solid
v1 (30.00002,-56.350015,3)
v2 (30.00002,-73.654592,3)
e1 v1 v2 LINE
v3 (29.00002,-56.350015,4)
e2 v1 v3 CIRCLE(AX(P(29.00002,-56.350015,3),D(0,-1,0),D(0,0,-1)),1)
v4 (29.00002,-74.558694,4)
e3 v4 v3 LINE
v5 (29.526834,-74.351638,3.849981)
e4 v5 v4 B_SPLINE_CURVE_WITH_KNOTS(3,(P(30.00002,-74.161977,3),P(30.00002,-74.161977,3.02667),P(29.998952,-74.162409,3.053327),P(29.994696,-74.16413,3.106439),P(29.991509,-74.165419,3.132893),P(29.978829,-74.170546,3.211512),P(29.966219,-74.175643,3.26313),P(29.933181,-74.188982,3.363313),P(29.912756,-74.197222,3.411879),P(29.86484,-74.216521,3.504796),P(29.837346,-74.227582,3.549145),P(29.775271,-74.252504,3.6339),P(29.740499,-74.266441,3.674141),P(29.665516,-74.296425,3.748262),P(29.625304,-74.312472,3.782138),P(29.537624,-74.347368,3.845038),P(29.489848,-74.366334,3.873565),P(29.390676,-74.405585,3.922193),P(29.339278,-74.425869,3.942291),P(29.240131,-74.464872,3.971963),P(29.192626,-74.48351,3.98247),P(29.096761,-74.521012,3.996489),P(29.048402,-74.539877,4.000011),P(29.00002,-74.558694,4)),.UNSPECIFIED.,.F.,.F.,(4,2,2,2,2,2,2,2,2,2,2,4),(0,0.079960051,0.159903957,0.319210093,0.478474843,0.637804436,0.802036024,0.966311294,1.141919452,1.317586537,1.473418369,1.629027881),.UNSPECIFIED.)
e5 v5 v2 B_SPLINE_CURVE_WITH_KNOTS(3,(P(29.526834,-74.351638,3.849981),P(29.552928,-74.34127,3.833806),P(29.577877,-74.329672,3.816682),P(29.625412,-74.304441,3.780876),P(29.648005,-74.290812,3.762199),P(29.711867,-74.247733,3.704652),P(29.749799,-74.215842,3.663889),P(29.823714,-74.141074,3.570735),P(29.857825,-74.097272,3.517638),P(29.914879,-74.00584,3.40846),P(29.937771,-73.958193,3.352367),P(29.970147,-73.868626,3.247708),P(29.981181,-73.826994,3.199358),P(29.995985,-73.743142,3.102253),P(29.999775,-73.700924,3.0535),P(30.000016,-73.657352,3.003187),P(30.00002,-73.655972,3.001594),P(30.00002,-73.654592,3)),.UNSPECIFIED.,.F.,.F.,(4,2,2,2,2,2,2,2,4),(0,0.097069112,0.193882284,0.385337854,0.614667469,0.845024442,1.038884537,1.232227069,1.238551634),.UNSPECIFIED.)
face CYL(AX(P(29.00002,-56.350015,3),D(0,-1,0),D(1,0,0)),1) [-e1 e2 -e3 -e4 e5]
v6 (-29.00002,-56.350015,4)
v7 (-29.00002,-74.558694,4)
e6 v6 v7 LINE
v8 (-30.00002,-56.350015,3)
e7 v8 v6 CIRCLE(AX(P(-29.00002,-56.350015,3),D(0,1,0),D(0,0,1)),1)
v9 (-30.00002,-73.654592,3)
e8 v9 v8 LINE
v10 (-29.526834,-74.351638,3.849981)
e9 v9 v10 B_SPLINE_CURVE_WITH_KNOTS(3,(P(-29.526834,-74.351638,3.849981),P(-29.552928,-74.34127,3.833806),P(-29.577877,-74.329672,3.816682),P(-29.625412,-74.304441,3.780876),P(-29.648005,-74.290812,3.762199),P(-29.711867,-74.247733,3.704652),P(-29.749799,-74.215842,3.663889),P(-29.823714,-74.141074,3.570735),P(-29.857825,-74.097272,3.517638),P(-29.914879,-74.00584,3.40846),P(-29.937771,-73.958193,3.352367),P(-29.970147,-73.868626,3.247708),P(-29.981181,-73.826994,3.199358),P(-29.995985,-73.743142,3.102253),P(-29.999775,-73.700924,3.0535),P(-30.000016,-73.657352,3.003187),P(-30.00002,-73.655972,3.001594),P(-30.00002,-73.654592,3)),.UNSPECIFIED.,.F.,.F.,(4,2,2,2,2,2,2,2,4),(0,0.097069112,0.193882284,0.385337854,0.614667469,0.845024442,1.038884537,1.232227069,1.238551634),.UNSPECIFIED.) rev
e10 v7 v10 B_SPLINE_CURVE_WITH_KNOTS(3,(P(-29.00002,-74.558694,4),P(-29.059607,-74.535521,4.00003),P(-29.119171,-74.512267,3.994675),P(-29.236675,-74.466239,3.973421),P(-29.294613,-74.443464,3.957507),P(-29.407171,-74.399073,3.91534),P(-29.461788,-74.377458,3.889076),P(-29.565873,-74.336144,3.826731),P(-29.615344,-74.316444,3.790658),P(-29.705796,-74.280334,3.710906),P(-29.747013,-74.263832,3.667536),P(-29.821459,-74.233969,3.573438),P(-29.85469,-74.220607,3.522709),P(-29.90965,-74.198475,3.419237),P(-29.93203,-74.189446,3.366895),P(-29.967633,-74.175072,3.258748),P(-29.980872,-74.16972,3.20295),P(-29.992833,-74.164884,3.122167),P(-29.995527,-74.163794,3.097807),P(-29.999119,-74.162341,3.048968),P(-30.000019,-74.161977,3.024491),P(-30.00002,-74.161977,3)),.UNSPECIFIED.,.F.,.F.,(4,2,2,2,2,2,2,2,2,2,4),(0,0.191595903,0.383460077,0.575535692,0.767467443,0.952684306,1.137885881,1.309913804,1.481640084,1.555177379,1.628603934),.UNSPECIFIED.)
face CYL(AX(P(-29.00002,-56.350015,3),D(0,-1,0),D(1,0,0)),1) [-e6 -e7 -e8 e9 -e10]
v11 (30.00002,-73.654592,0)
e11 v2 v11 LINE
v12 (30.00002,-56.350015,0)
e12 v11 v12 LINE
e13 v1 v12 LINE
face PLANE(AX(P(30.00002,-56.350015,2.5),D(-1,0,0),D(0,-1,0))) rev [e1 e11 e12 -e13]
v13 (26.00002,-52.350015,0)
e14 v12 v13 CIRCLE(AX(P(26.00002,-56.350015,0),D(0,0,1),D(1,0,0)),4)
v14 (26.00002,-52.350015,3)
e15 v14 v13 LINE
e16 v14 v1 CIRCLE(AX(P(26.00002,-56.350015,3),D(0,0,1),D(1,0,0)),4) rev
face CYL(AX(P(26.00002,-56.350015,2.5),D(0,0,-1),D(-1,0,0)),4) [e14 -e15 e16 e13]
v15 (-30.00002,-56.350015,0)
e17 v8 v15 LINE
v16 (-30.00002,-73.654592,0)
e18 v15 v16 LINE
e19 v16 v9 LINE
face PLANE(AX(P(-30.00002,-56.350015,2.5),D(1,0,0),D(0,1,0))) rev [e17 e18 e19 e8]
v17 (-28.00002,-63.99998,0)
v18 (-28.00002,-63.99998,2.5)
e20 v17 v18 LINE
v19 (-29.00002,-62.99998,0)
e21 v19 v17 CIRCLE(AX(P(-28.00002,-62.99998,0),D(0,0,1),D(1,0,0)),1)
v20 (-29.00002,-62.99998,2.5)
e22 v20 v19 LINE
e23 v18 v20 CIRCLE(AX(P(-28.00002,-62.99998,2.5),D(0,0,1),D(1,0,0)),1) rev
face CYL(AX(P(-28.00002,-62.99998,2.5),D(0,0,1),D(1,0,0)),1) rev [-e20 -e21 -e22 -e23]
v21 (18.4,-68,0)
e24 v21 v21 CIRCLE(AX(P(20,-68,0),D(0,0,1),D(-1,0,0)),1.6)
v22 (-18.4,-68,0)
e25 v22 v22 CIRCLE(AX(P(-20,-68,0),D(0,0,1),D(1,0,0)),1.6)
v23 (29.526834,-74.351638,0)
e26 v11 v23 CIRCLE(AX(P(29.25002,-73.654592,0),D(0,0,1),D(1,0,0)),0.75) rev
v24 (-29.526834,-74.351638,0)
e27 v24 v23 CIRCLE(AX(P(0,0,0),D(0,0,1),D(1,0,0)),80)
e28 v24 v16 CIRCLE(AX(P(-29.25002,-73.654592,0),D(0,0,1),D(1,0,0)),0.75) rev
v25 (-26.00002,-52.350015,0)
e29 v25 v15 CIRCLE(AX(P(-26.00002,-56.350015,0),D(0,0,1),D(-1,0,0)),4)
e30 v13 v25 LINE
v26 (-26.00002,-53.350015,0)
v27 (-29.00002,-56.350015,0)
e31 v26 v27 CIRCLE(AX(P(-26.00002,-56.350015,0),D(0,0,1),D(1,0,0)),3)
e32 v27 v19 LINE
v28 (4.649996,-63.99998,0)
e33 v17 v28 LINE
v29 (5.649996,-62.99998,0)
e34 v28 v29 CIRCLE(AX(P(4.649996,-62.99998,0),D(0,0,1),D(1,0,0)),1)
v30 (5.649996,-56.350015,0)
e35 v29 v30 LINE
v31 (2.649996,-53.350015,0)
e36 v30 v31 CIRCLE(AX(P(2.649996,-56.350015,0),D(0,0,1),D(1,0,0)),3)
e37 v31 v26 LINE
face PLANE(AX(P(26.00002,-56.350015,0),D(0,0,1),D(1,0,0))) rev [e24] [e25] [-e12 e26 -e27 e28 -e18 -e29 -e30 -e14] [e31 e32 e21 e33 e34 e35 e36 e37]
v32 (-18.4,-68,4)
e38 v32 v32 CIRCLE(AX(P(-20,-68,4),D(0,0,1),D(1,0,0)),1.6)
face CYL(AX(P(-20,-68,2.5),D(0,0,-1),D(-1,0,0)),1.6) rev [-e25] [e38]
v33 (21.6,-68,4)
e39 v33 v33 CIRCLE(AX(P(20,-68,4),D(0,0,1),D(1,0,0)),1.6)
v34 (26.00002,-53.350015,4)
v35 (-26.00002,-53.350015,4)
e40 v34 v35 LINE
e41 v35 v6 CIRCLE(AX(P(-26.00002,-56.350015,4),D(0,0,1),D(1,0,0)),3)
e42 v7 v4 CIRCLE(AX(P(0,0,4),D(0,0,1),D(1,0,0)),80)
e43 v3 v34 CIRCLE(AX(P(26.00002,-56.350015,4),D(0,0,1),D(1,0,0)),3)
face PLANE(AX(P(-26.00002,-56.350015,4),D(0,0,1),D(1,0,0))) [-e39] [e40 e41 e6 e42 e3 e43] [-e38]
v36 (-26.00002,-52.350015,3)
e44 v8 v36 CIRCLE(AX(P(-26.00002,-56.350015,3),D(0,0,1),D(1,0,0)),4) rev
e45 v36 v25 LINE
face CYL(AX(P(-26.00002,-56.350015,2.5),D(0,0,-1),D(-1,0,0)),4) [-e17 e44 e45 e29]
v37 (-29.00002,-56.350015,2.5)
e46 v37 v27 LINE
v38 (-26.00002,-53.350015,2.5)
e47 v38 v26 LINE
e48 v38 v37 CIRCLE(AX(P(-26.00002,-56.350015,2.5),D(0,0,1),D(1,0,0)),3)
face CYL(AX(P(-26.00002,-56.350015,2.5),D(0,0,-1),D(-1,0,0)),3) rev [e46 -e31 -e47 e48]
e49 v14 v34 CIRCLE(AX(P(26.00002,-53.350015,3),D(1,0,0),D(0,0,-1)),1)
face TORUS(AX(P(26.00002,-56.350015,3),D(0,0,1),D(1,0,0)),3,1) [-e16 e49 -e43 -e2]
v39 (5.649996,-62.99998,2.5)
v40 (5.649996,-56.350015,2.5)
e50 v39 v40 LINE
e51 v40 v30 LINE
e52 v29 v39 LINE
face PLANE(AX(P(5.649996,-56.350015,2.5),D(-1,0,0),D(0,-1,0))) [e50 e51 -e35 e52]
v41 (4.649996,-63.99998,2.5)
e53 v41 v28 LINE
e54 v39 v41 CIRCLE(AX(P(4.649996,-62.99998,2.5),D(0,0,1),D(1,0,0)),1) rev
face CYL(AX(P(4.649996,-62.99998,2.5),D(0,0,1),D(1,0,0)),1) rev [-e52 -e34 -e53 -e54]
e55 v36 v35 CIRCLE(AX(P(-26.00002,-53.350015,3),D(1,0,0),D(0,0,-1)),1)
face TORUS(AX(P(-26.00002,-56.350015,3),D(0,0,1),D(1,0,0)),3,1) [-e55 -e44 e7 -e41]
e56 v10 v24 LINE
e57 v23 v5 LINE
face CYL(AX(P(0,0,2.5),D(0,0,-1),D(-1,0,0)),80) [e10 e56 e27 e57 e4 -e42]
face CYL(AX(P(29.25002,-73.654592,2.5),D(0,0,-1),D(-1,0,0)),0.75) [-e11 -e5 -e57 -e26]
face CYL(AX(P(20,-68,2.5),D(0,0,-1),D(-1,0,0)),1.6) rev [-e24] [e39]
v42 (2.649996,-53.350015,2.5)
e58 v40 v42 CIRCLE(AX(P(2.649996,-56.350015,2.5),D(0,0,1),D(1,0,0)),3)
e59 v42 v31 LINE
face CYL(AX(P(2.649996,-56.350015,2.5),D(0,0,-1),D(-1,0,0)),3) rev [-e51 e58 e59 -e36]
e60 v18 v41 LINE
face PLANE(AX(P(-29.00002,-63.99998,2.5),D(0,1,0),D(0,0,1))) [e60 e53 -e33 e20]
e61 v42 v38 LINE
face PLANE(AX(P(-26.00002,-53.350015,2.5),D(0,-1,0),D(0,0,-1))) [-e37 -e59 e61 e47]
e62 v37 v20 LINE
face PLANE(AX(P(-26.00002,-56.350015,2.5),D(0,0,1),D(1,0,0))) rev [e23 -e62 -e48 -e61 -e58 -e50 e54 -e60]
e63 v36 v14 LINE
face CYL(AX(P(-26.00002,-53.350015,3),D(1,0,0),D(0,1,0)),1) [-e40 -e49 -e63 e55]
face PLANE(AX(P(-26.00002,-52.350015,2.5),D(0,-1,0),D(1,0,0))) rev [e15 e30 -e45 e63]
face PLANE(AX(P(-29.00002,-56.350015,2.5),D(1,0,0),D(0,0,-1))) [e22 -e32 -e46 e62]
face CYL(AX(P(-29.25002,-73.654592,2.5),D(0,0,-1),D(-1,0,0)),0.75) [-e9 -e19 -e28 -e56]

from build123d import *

# Parameters (mm, degrees)
SKETCH_1_R      = 1.6
EXTRUDE_1_DEPTH = 2.5
EXTRUDE_START   = 2.5
SKETCH_1_2_R    = 1.6
EXTRUDE_2_DEPTH = 1.5
FILLET_1_R      = 1
FILLET_2_R      = 1
FILLET_3_R      = 0.75


with BuildPart() as part:
    # Эскиз1 → Бобышка-Вытянуть1 (new body)
    with BuildSketch(Plane.XY):
        with BuildLine():
            Line((-26.000019619, -52.3500154), (26.000019619, -52.3500154))
            ThreePointArc((26.000019619, -52.3500154), (28.828446744, -53.521588275), (30.000019619, -56.3500154))
            Line((30.000019619, -56.3500154), (30.000019619, -74.161976935))
            ThreePointArc((30.000019619, -74.161976935), (0, -80), (-30.000019619, -74.161976935))
            Line((-30.000019619, -74.161976935), (-30.000019619, -56.3500154))
            ThreePointArc((-30.000019619, -56.3500154), (-28.828446744, -53.521588275), (-26.000019619, -52.3500154))
        make_face()
        with Locations((-20, -68)):
            Circle(SKETCH_1_R, mode=Mode.SUBTRACT)
        with Locations(Location((20, -68, 0), (0, 0, 180))):
            Circle(SKETCH_1_R, mode=Mode.SUBTRACT)
        with BuildLine():
            Line((-26.000019619, -53.3500154), (2.649996038, -53.3500154))
            ThreePointArc((2.649996038, -53.3500154), (4.771316381, -54.228695057), (5.649996038, -56.3500154))
            Line((5.649996038, -56.3500154), (5.649996038, -63.999979818))
            Line((5.649996038, -63.999979818), (-29.000019619, -63.999979818))
            Line((-29.000019619, -63.999979818), (-29.000019619, -56.3500154))
            ThreePointArc((-29.000019619, -56.3500154), (-28.121339962, -54.228695057), (-26.000019619, -53.3500154))
        make_face(mode=Mode.SUBTRACT)
    extrude(amount=EXTRUDE_1_DEPTH)

    # Эскиз1<2> → Бобышка-Вытянуть2 (add)
    with BuildSketch(Plane.XY.offset(EXTRUDE_START)):
        with BuildLine():
            Line((-26.000019619, -52.3500154), (26.000019619, -52.3500154))
            ThreePointArc((26.000019619, -52.3500154), (28.828446744, -53.521588275), (30.000019619, -56.3500154))
            Line((30.000019619, -56.3500154), (30.000019619, -74.161976935))
            ThreePointArc((30.000019619, -74.161976935), (0, -80), (-30.000019619, -74.161976935))
            Line((-30.000019619, -74.161976935), (-30.000019619, -56.3500154))
            ThreePointArc((-30.000019619, -56.3500154), (-28.828446744, -53.521588275), (-26.000019619, -52.3500154))
        make_face()
        with Locations((-20, -68)):
            Circle(SKETCH_1_2_R, mode=Mode.SUBTRACT)
        with Locations(Location((20, -68, 0), (0, 0, 180))):
            Circle(SKETCH_1_2_R, mode=Mode.SUBTRACT)
    extrude(amount=EXTRUDE_2_DEPTH)

    # Скругление1
    fillet_1_edges = [part.edges().sort_by_distance(p)[0] for p in [
        (5.649996038, -63.999979818, 1.25),
        (-29.000019619, -63.999979818, 1.25),
    ]]
    fillet(fillet_1_edges, radius=FILLET_1_R)

    # Скругление2
    fillet_2_edges = [part.edges().sort_by_distance(p)[0] for p in [
        (30.000019619, -65.255996167, 4),
        (28.828446744, -53.521588275, 4),
        (0, -52.3500154, 4),
        (-28.828446744, -53.521588275, 4),
        (-30.000019619, -65.255996167, 4),
    ]]
    fillet(fillet_2_edges, radius=FILLET_2_R)

    # Скругление3
    # the kernel refuses this fillet: 0.75 mm, written as the material it takes off along each edge
    with BuildSketch(Plane(origin=(-30.000019619, -74.161976935, -1.274451591), x_dir=(0, 1, 0), z_dir=(0, 0, 1))) as fillet_3_piece_1:
        with BuildLine():
            CenterArc((0.507385413, -0.75), FILLET_3_R, 90, 68.34077611)
            ThreePointArc((-0.189661195, -0.473185934), (-0.095207506, -0.236441895), (0, 0))
            Line((0, 0), (0.507385413, 0))
        make_face()
    extrude(amount=5.548903182, mode=Mode.SUBTRACT)
    with BuildSketch(Plane(origin=(30.000019619, -74.161976935, -1.274451591), x_dir=(-0.9282148055127167, -0.3720447215416308, 0), z_dir=(0, 0, 1))) as fillet_3_piece_2:
        with BuildLine():
            CenterArc((0.50739104, -0.749996193), FILLET_3_R, 89.817447948, 68.34077611)
            Line((-0.188770065, -0.470962652), (0, 0))
            ThreePointArc((0, 0), (0.254890318, 0.000406058), (0.509780636, 0))
        make_face()
    extrude(amount=5.548903182, mode=Mode.SUBTRACT)


solid = part.part
